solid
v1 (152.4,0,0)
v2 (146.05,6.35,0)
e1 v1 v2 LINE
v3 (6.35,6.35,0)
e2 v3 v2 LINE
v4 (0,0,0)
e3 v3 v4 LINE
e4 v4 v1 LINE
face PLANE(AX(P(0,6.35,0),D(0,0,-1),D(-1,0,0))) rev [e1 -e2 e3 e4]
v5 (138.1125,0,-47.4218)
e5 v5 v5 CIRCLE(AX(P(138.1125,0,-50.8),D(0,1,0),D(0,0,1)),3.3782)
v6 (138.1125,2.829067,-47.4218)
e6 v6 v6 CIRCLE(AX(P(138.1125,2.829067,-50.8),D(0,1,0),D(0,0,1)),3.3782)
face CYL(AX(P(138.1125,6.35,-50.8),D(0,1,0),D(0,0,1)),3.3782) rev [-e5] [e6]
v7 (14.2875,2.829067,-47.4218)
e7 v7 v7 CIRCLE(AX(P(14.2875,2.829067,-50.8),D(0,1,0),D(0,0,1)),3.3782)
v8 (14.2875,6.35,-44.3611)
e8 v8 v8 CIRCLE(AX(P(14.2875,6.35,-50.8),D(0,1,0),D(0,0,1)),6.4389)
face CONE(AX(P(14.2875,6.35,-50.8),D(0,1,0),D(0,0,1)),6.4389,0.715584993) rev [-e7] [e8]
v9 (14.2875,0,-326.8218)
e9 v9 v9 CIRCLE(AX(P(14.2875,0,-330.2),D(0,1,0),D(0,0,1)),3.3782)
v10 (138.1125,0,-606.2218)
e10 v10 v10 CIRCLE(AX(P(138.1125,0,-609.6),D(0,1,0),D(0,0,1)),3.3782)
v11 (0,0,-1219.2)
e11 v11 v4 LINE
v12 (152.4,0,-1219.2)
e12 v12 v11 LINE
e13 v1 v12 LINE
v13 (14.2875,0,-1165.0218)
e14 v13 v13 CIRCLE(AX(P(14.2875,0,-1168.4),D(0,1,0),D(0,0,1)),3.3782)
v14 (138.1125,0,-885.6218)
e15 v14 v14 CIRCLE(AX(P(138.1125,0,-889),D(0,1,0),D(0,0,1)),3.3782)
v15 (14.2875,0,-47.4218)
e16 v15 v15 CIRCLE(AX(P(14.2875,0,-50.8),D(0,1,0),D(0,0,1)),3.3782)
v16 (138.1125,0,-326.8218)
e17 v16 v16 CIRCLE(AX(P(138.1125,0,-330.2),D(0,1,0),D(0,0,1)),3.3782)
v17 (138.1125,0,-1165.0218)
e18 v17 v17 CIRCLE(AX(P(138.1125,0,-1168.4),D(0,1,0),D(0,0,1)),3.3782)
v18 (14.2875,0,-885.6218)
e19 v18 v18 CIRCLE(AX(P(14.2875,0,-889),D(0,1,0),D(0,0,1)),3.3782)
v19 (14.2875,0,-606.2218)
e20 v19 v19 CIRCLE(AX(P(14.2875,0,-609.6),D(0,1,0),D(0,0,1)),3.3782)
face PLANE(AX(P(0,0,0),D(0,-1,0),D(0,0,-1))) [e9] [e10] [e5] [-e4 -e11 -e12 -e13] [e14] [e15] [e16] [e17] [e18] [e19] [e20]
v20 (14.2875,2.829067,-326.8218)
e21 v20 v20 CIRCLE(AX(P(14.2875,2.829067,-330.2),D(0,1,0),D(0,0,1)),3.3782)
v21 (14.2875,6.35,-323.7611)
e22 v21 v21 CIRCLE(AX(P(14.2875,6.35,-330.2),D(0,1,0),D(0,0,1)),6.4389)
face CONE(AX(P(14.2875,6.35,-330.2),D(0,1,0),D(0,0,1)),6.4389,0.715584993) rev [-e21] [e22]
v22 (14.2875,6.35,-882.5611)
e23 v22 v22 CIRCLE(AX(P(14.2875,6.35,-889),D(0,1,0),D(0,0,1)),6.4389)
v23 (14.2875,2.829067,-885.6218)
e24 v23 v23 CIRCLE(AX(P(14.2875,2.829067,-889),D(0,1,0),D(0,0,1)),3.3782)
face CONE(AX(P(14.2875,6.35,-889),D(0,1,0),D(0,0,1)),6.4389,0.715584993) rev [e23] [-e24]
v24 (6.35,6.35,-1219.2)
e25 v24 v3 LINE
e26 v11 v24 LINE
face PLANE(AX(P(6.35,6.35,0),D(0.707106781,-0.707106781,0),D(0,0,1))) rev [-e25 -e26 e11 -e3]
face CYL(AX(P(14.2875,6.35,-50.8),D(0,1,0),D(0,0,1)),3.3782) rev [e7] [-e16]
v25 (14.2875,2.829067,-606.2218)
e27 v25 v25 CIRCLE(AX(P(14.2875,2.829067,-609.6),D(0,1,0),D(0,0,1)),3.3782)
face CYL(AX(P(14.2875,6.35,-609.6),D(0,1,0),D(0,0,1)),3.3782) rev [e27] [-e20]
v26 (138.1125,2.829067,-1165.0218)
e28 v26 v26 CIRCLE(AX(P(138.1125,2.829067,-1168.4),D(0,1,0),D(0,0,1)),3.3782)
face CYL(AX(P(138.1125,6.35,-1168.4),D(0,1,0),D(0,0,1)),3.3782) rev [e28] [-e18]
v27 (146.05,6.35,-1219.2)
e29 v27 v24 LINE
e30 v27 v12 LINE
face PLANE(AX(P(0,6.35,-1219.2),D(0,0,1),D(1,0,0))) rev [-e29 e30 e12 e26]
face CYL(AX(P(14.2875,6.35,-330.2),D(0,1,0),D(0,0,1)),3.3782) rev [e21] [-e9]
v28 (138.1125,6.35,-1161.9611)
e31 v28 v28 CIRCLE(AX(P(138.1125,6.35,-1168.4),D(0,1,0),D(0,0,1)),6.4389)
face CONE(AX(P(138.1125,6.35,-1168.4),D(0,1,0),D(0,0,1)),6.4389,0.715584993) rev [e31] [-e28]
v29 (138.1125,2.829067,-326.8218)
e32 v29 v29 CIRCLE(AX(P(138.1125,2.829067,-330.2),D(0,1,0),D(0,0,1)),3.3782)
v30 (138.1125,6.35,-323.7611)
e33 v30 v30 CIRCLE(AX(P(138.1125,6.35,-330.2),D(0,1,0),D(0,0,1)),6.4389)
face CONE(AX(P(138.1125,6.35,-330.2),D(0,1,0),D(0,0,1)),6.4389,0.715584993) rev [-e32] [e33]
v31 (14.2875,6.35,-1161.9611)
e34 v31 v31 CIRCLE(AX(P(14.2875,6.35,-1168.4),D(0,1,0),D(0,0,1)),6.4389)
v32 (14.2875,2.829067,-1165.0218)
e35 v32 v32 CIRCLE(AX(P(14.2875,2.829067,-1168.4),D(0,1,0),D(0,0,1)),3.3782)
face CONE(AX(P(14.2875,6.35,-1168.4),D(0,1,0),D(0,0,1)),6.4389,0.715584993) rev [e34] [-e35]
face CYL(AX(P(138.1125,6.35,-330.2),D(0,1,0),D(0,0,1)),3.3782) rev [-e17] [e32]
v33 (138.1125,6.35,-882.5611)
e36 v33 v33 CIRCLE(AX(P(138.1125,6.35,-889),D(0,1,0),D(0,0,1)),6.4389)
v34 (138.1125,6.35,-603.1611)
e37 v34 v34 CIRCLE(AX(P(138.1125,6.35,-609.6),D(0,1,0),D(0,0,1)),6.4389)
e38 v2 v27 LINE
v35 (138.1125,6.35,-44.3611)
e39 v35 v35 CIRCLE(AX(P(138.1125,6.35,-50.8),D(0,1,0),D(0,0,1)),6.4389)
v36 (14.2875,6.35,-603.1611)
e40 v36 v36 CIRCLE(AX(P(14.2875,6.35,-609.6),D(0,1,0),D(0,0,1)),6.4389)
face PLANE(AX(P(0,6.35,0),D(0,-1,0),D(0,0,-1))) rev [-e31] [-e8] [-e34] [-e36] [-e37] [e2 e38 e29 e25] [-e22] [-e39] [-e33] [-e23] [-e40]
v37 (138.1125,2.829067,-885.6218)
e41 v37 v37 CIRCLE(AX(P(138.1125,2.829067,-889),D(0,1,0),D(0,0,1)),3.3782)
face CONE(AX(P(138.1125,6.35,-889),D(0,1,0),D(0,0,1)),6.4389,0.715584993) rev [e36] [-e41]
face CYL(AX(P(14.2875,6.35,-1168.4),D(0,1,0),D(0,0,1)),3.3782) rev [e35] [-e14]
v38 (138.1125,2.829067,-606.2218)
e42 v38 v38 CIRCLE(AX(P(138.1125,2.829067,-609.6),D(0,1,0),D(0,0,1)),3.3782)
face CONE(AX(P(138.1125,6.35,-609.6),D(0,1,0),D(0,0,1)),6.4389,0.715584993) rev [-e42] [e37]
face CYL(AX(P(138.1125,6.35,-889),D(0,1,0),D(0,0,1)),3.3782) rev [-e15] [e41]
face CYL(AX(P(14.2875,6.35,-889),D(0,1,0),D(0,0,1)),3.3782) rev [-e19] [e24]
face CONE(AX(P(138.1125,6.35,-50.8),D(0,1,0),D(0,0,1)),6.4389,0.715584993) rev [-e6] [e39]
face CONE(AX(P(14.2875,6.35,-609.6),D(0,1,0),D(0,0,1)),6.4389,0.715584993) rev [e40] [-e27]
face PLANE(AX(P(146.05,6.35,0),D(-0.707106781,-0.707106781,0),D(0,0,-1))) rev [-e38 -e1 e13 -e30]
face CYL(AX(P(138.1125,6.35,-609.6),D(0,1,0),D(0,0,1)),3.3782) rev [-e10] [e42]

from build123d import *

# Parameters (mm, degrees)
SKETCH1_W                                     = 152.4
SKETCH1_H                                     = 1219.2
BOSS_EXTRUDE1_DEPTH                           = 6.35
CSK_FOR_1_4_FLAT_HEAD_MACHINE_SCREW1_AT_COUNT = 2
CSK_FOR_1_4_FLAT_HEAD_MACHINE_SCREW1_AT_PITCH = 123.825
CSK_FOR_1_4_FLAT_HEAD_MACHINE_SCREW1_2_COUNT  = 2
CSK_FOR_1_4_FLAT_HEAD_MACHINE_SCREW1_2_PITCH  = 305.609212271
CSK_FOR_1_4_FLAT_HEAD_MACHINE_SCREW1_3_COUNT  = 2
CSK_FOR_1_4_FLAT_HEAD_MACHINE_SCREW1_3_PITCH  = 572.354846773
CSK_FOR_1_4_FLAT_HEAD_MACHINE_SCREW1_4_COUNT  = 2
CSK_FOR_1_4_FLAT_HEAD_MACHINE_SCREW1_4_PITCH  = 847.296801968
CSK_FOR_1_4_FLAT_HEAD_MACHINE_SCREW1_5_COUNT  = 2
CSK_FOR_1_4_FLAT_HEAD_MACHINE_SCREW1_5_PITCH  = 1124.438700252
CSK_FOR_1_4_FLAT_HEAD_MACHINE_SCREW1_6_COUNT  = 2
CSK_FOR_1_4_FLAT_HEAD_MACHINE_SCREW1_6_PITCH  = 279.4
CSK_FOR_1_4_FLAT_HEAD_MACHINE_SCREW1_7_COUNT  = 2
CSK_FOR_1_4_FLAT_HEAD_MACHINE_SCREW1_7_PITCH  = 558.8
CSK_FOR_1_4_FLAT_HEAD_MACHINE_SCREW1_8_COUNT  = 2
CSK_FOR_1_4_FLAT_HEAD_MACHINE_SCREW1_8_PITCH  = 838.2
CSK_FOR_1_4_FLAT_HEAD_MACHINE_SCREW1_9_COUNT  = 2
CSK_FOR_1_4_FLAT_HEAD_MACHINE_SCREW1_9_PITCH  = 1117.6
CHAMFER1_SIZE                                 = 6.35


with BuildPart() as part:
    # Sketch1 → Boss-Extrude1 (new body)
    with BuildSketch(Plane(origin=(0, 0, 0), x_dir=(1, 0, 0), z_dir=(0, 1, 0))):
        with Locations((76.2, 609.6)):
            Rectangle(SKETCH1_W, SKETCH1_H)
    extrude(amount=BOSS_EXTRUDE1_DEPTH)

    # Sketch3 → CSK for 1/4 Flat Head Machine Screw1 (revolve, cut)
    with BuildSketch(Plane(origin=(14.2875, 6.35, -1168.4), x_dir=(0, 0, 1), z_dir=(1, 0, 0))):
        Polygon((0, 0), (0, 6.35), (3.3782, 6.35), (3.3782, 3.520932584), (6.4389, 0), align=None)
    csk_for_1_4_flat_head_machine_screw1 = revolve(axis=Axis((14.2875, 12.7, -1168.4), (0, -1, 0)), mode=Mode.SUBTRACT)

    # CSK for 1/4 Flat Head Machine Screw1 at: CSK for 1/4 Flat Head Machine Screw1 ×2
    with Locations(*[(i * CSK_FOR_1_4_FLAT_HEAD_MACHINE_SCREW1_AT_PITCH, 0, 0) for i in range(1, CSK_FOR_1_4_FLAT_HEAD_MACHINE_SCREW1_AT_COUNT)]):
        add(csk_for_1_4_flat_head_machine_screw1, mode=Mode.SUBTRACT)

    # CSK for 1_4 Flat Head Machine Screw1 2: CSK for 1/4 Flat Head Machine Screw1 ×2
    with Locations(*[Vector(0.405174304399354, 0, 0.9142394560805718) * (i * CSK_FOR_1_4_FLAT_HEAD_MACHINE_SCREW1_2_PITCH) for i in range(1, CSK_FOR_1_4_FLAT_HEAD_MACHINE_SCREW1_2_COUNT)]):
        add(csk_for_1_4_flat_head_machine_screw1, mode=Mode.SUBTRACT)

    # CSK for 1_4 Flat Head Machine Screw1 3: CSK for 1/4 Flat Head Machine Screw1 ×2
    with Locations(*[Vector(0.21634306182267615, 0, 0.9763174071997232) * (i * CSK_FOR_1_4_FLAT_HEAD_MACHINE_SCREW1_3_PITCH) for i in range(1, CSK_FOR_1_4_FLAT_HEAD_MACHINE_SCREW1_3_COUNT)]):
        add(csk_for_1_4_flat_head_machine_screw1, mode=Mode.SUBTRACT)

    # CSK for 1_4 Flat Head Machine Screw1 4: CSK for 1/4 Flat Head Machine Screw1 ×2
    with Locations(*[Vector(0.1461412337594335, 0, 0.9892637362176331) * (i * CSK_FOR_1_4_FLAT_HEAD_MACHINE_SCREW1_4_PITCH) for i in range(1, CSK_FOR_1_4_FLAT_HEAD_MACHINE_SCREW1_4_COUNT)]):
        add(csk_for_1_4_flat_head_machine_screw1, mode=Mode.SUBTRACT)

    # CSK for 1_4 Flat Head Machine Screw1 5: CSK for 1/4 Flat Head Machine Screw1 ×2
    with Locations(*[Vector(0.11012160998392527, 0, 0.9939181208804618) * (i * CSK_FOR_1_4_FLAT_HEAD_MACHINE_SCREW1_5_PITCH) for i in range(1, CSK_FOR_1_4_FLAT_HEAD_MACHINE_SCREW1_5_COUNT)]):
        add(csk_for_1_4_flat_head_machine_screw1, mode=Mode.SUBTRACT)

    # CSK for 1_4 Flat Head Machine Screw1 6: CSK for 1/4 Flat Head Machine Screw1 ×2
    with Locations(*[(0, 0, i * CSK_FOR_1_4_FLAT_HEAD_MACHINE_SCREW1_6_PITCH) for i in range(1, CSK_FOR_1_4_FLAT_HEAD_MACHINE_SCREW1_6_COUNT)]):
        add(csk_for_1_4_flat_head_machine_screw1, mode=Mode.SUBTRACT)

    # CSK for 1_4 Flat Head Machine Screw1 7: CSK for 1/4 Flat Head Machine Screw1 ×2
    with Locations(*[(0, 0, i * CSK_FOR_1_4_FLAT_HEAD_MACHINE_SCREW1_7_PITCH) for i in range(1, CSK_FOR_1_4_FLAT_HEAD_MACHINE_SCREW1_7_COUNT)]):
        add(csk_for_1_4_flat_head_machine_screw1, mode=Mode.SUBTRACT)

    # CSK for 1_4 Flat Head Machine Screw1 8: CSK for 1/4 Flat Head Machine Screw1 ×2
    with Locations(*[(0, 0, i * CSK_FOR_1_4_FLAT_HEAD_MACHINE_SCREW1_8_PITCH) for i in range(1, CSK_FOR_1_4_FLAT_HEAD_MACHINE_SCREW1_8_COUNT)]):
        add(csk_for_1_4_flat_head_machine_screw1, mode=Mode.SUBTRACT)

    # CSK for 1_4 Flat Head Machine Screw1 9: CSK for 1/4 Flat Head Machine Screw1 ×2
    with Locations(*[(0, 0, i * CSK_FOR_1_4_FLAT_HEAD_MACHINE_SCREW1_9_PITCH) for i in range(1, CSK_FOR_1_4_FLAT_HEAD_MACHINE_SCREW1_9_COUNT)]):
        add(csk_for_1_4_flat_head_machine_screw1, mode=Mode.SUBTRACT)

    # Chamfer1
    chamfer1_edges = [part.edges().sort_by_distance(p)[0] for p in [
        (0, 6.35, -609.6),
        (152.4, 6.35, -609.6),
    ]]
    chamfer(chamfer1_edges, length=CHAMFER1_SIZE - 0.0001)  # a hair under: the kernel refuses the full size


solid = part.part
